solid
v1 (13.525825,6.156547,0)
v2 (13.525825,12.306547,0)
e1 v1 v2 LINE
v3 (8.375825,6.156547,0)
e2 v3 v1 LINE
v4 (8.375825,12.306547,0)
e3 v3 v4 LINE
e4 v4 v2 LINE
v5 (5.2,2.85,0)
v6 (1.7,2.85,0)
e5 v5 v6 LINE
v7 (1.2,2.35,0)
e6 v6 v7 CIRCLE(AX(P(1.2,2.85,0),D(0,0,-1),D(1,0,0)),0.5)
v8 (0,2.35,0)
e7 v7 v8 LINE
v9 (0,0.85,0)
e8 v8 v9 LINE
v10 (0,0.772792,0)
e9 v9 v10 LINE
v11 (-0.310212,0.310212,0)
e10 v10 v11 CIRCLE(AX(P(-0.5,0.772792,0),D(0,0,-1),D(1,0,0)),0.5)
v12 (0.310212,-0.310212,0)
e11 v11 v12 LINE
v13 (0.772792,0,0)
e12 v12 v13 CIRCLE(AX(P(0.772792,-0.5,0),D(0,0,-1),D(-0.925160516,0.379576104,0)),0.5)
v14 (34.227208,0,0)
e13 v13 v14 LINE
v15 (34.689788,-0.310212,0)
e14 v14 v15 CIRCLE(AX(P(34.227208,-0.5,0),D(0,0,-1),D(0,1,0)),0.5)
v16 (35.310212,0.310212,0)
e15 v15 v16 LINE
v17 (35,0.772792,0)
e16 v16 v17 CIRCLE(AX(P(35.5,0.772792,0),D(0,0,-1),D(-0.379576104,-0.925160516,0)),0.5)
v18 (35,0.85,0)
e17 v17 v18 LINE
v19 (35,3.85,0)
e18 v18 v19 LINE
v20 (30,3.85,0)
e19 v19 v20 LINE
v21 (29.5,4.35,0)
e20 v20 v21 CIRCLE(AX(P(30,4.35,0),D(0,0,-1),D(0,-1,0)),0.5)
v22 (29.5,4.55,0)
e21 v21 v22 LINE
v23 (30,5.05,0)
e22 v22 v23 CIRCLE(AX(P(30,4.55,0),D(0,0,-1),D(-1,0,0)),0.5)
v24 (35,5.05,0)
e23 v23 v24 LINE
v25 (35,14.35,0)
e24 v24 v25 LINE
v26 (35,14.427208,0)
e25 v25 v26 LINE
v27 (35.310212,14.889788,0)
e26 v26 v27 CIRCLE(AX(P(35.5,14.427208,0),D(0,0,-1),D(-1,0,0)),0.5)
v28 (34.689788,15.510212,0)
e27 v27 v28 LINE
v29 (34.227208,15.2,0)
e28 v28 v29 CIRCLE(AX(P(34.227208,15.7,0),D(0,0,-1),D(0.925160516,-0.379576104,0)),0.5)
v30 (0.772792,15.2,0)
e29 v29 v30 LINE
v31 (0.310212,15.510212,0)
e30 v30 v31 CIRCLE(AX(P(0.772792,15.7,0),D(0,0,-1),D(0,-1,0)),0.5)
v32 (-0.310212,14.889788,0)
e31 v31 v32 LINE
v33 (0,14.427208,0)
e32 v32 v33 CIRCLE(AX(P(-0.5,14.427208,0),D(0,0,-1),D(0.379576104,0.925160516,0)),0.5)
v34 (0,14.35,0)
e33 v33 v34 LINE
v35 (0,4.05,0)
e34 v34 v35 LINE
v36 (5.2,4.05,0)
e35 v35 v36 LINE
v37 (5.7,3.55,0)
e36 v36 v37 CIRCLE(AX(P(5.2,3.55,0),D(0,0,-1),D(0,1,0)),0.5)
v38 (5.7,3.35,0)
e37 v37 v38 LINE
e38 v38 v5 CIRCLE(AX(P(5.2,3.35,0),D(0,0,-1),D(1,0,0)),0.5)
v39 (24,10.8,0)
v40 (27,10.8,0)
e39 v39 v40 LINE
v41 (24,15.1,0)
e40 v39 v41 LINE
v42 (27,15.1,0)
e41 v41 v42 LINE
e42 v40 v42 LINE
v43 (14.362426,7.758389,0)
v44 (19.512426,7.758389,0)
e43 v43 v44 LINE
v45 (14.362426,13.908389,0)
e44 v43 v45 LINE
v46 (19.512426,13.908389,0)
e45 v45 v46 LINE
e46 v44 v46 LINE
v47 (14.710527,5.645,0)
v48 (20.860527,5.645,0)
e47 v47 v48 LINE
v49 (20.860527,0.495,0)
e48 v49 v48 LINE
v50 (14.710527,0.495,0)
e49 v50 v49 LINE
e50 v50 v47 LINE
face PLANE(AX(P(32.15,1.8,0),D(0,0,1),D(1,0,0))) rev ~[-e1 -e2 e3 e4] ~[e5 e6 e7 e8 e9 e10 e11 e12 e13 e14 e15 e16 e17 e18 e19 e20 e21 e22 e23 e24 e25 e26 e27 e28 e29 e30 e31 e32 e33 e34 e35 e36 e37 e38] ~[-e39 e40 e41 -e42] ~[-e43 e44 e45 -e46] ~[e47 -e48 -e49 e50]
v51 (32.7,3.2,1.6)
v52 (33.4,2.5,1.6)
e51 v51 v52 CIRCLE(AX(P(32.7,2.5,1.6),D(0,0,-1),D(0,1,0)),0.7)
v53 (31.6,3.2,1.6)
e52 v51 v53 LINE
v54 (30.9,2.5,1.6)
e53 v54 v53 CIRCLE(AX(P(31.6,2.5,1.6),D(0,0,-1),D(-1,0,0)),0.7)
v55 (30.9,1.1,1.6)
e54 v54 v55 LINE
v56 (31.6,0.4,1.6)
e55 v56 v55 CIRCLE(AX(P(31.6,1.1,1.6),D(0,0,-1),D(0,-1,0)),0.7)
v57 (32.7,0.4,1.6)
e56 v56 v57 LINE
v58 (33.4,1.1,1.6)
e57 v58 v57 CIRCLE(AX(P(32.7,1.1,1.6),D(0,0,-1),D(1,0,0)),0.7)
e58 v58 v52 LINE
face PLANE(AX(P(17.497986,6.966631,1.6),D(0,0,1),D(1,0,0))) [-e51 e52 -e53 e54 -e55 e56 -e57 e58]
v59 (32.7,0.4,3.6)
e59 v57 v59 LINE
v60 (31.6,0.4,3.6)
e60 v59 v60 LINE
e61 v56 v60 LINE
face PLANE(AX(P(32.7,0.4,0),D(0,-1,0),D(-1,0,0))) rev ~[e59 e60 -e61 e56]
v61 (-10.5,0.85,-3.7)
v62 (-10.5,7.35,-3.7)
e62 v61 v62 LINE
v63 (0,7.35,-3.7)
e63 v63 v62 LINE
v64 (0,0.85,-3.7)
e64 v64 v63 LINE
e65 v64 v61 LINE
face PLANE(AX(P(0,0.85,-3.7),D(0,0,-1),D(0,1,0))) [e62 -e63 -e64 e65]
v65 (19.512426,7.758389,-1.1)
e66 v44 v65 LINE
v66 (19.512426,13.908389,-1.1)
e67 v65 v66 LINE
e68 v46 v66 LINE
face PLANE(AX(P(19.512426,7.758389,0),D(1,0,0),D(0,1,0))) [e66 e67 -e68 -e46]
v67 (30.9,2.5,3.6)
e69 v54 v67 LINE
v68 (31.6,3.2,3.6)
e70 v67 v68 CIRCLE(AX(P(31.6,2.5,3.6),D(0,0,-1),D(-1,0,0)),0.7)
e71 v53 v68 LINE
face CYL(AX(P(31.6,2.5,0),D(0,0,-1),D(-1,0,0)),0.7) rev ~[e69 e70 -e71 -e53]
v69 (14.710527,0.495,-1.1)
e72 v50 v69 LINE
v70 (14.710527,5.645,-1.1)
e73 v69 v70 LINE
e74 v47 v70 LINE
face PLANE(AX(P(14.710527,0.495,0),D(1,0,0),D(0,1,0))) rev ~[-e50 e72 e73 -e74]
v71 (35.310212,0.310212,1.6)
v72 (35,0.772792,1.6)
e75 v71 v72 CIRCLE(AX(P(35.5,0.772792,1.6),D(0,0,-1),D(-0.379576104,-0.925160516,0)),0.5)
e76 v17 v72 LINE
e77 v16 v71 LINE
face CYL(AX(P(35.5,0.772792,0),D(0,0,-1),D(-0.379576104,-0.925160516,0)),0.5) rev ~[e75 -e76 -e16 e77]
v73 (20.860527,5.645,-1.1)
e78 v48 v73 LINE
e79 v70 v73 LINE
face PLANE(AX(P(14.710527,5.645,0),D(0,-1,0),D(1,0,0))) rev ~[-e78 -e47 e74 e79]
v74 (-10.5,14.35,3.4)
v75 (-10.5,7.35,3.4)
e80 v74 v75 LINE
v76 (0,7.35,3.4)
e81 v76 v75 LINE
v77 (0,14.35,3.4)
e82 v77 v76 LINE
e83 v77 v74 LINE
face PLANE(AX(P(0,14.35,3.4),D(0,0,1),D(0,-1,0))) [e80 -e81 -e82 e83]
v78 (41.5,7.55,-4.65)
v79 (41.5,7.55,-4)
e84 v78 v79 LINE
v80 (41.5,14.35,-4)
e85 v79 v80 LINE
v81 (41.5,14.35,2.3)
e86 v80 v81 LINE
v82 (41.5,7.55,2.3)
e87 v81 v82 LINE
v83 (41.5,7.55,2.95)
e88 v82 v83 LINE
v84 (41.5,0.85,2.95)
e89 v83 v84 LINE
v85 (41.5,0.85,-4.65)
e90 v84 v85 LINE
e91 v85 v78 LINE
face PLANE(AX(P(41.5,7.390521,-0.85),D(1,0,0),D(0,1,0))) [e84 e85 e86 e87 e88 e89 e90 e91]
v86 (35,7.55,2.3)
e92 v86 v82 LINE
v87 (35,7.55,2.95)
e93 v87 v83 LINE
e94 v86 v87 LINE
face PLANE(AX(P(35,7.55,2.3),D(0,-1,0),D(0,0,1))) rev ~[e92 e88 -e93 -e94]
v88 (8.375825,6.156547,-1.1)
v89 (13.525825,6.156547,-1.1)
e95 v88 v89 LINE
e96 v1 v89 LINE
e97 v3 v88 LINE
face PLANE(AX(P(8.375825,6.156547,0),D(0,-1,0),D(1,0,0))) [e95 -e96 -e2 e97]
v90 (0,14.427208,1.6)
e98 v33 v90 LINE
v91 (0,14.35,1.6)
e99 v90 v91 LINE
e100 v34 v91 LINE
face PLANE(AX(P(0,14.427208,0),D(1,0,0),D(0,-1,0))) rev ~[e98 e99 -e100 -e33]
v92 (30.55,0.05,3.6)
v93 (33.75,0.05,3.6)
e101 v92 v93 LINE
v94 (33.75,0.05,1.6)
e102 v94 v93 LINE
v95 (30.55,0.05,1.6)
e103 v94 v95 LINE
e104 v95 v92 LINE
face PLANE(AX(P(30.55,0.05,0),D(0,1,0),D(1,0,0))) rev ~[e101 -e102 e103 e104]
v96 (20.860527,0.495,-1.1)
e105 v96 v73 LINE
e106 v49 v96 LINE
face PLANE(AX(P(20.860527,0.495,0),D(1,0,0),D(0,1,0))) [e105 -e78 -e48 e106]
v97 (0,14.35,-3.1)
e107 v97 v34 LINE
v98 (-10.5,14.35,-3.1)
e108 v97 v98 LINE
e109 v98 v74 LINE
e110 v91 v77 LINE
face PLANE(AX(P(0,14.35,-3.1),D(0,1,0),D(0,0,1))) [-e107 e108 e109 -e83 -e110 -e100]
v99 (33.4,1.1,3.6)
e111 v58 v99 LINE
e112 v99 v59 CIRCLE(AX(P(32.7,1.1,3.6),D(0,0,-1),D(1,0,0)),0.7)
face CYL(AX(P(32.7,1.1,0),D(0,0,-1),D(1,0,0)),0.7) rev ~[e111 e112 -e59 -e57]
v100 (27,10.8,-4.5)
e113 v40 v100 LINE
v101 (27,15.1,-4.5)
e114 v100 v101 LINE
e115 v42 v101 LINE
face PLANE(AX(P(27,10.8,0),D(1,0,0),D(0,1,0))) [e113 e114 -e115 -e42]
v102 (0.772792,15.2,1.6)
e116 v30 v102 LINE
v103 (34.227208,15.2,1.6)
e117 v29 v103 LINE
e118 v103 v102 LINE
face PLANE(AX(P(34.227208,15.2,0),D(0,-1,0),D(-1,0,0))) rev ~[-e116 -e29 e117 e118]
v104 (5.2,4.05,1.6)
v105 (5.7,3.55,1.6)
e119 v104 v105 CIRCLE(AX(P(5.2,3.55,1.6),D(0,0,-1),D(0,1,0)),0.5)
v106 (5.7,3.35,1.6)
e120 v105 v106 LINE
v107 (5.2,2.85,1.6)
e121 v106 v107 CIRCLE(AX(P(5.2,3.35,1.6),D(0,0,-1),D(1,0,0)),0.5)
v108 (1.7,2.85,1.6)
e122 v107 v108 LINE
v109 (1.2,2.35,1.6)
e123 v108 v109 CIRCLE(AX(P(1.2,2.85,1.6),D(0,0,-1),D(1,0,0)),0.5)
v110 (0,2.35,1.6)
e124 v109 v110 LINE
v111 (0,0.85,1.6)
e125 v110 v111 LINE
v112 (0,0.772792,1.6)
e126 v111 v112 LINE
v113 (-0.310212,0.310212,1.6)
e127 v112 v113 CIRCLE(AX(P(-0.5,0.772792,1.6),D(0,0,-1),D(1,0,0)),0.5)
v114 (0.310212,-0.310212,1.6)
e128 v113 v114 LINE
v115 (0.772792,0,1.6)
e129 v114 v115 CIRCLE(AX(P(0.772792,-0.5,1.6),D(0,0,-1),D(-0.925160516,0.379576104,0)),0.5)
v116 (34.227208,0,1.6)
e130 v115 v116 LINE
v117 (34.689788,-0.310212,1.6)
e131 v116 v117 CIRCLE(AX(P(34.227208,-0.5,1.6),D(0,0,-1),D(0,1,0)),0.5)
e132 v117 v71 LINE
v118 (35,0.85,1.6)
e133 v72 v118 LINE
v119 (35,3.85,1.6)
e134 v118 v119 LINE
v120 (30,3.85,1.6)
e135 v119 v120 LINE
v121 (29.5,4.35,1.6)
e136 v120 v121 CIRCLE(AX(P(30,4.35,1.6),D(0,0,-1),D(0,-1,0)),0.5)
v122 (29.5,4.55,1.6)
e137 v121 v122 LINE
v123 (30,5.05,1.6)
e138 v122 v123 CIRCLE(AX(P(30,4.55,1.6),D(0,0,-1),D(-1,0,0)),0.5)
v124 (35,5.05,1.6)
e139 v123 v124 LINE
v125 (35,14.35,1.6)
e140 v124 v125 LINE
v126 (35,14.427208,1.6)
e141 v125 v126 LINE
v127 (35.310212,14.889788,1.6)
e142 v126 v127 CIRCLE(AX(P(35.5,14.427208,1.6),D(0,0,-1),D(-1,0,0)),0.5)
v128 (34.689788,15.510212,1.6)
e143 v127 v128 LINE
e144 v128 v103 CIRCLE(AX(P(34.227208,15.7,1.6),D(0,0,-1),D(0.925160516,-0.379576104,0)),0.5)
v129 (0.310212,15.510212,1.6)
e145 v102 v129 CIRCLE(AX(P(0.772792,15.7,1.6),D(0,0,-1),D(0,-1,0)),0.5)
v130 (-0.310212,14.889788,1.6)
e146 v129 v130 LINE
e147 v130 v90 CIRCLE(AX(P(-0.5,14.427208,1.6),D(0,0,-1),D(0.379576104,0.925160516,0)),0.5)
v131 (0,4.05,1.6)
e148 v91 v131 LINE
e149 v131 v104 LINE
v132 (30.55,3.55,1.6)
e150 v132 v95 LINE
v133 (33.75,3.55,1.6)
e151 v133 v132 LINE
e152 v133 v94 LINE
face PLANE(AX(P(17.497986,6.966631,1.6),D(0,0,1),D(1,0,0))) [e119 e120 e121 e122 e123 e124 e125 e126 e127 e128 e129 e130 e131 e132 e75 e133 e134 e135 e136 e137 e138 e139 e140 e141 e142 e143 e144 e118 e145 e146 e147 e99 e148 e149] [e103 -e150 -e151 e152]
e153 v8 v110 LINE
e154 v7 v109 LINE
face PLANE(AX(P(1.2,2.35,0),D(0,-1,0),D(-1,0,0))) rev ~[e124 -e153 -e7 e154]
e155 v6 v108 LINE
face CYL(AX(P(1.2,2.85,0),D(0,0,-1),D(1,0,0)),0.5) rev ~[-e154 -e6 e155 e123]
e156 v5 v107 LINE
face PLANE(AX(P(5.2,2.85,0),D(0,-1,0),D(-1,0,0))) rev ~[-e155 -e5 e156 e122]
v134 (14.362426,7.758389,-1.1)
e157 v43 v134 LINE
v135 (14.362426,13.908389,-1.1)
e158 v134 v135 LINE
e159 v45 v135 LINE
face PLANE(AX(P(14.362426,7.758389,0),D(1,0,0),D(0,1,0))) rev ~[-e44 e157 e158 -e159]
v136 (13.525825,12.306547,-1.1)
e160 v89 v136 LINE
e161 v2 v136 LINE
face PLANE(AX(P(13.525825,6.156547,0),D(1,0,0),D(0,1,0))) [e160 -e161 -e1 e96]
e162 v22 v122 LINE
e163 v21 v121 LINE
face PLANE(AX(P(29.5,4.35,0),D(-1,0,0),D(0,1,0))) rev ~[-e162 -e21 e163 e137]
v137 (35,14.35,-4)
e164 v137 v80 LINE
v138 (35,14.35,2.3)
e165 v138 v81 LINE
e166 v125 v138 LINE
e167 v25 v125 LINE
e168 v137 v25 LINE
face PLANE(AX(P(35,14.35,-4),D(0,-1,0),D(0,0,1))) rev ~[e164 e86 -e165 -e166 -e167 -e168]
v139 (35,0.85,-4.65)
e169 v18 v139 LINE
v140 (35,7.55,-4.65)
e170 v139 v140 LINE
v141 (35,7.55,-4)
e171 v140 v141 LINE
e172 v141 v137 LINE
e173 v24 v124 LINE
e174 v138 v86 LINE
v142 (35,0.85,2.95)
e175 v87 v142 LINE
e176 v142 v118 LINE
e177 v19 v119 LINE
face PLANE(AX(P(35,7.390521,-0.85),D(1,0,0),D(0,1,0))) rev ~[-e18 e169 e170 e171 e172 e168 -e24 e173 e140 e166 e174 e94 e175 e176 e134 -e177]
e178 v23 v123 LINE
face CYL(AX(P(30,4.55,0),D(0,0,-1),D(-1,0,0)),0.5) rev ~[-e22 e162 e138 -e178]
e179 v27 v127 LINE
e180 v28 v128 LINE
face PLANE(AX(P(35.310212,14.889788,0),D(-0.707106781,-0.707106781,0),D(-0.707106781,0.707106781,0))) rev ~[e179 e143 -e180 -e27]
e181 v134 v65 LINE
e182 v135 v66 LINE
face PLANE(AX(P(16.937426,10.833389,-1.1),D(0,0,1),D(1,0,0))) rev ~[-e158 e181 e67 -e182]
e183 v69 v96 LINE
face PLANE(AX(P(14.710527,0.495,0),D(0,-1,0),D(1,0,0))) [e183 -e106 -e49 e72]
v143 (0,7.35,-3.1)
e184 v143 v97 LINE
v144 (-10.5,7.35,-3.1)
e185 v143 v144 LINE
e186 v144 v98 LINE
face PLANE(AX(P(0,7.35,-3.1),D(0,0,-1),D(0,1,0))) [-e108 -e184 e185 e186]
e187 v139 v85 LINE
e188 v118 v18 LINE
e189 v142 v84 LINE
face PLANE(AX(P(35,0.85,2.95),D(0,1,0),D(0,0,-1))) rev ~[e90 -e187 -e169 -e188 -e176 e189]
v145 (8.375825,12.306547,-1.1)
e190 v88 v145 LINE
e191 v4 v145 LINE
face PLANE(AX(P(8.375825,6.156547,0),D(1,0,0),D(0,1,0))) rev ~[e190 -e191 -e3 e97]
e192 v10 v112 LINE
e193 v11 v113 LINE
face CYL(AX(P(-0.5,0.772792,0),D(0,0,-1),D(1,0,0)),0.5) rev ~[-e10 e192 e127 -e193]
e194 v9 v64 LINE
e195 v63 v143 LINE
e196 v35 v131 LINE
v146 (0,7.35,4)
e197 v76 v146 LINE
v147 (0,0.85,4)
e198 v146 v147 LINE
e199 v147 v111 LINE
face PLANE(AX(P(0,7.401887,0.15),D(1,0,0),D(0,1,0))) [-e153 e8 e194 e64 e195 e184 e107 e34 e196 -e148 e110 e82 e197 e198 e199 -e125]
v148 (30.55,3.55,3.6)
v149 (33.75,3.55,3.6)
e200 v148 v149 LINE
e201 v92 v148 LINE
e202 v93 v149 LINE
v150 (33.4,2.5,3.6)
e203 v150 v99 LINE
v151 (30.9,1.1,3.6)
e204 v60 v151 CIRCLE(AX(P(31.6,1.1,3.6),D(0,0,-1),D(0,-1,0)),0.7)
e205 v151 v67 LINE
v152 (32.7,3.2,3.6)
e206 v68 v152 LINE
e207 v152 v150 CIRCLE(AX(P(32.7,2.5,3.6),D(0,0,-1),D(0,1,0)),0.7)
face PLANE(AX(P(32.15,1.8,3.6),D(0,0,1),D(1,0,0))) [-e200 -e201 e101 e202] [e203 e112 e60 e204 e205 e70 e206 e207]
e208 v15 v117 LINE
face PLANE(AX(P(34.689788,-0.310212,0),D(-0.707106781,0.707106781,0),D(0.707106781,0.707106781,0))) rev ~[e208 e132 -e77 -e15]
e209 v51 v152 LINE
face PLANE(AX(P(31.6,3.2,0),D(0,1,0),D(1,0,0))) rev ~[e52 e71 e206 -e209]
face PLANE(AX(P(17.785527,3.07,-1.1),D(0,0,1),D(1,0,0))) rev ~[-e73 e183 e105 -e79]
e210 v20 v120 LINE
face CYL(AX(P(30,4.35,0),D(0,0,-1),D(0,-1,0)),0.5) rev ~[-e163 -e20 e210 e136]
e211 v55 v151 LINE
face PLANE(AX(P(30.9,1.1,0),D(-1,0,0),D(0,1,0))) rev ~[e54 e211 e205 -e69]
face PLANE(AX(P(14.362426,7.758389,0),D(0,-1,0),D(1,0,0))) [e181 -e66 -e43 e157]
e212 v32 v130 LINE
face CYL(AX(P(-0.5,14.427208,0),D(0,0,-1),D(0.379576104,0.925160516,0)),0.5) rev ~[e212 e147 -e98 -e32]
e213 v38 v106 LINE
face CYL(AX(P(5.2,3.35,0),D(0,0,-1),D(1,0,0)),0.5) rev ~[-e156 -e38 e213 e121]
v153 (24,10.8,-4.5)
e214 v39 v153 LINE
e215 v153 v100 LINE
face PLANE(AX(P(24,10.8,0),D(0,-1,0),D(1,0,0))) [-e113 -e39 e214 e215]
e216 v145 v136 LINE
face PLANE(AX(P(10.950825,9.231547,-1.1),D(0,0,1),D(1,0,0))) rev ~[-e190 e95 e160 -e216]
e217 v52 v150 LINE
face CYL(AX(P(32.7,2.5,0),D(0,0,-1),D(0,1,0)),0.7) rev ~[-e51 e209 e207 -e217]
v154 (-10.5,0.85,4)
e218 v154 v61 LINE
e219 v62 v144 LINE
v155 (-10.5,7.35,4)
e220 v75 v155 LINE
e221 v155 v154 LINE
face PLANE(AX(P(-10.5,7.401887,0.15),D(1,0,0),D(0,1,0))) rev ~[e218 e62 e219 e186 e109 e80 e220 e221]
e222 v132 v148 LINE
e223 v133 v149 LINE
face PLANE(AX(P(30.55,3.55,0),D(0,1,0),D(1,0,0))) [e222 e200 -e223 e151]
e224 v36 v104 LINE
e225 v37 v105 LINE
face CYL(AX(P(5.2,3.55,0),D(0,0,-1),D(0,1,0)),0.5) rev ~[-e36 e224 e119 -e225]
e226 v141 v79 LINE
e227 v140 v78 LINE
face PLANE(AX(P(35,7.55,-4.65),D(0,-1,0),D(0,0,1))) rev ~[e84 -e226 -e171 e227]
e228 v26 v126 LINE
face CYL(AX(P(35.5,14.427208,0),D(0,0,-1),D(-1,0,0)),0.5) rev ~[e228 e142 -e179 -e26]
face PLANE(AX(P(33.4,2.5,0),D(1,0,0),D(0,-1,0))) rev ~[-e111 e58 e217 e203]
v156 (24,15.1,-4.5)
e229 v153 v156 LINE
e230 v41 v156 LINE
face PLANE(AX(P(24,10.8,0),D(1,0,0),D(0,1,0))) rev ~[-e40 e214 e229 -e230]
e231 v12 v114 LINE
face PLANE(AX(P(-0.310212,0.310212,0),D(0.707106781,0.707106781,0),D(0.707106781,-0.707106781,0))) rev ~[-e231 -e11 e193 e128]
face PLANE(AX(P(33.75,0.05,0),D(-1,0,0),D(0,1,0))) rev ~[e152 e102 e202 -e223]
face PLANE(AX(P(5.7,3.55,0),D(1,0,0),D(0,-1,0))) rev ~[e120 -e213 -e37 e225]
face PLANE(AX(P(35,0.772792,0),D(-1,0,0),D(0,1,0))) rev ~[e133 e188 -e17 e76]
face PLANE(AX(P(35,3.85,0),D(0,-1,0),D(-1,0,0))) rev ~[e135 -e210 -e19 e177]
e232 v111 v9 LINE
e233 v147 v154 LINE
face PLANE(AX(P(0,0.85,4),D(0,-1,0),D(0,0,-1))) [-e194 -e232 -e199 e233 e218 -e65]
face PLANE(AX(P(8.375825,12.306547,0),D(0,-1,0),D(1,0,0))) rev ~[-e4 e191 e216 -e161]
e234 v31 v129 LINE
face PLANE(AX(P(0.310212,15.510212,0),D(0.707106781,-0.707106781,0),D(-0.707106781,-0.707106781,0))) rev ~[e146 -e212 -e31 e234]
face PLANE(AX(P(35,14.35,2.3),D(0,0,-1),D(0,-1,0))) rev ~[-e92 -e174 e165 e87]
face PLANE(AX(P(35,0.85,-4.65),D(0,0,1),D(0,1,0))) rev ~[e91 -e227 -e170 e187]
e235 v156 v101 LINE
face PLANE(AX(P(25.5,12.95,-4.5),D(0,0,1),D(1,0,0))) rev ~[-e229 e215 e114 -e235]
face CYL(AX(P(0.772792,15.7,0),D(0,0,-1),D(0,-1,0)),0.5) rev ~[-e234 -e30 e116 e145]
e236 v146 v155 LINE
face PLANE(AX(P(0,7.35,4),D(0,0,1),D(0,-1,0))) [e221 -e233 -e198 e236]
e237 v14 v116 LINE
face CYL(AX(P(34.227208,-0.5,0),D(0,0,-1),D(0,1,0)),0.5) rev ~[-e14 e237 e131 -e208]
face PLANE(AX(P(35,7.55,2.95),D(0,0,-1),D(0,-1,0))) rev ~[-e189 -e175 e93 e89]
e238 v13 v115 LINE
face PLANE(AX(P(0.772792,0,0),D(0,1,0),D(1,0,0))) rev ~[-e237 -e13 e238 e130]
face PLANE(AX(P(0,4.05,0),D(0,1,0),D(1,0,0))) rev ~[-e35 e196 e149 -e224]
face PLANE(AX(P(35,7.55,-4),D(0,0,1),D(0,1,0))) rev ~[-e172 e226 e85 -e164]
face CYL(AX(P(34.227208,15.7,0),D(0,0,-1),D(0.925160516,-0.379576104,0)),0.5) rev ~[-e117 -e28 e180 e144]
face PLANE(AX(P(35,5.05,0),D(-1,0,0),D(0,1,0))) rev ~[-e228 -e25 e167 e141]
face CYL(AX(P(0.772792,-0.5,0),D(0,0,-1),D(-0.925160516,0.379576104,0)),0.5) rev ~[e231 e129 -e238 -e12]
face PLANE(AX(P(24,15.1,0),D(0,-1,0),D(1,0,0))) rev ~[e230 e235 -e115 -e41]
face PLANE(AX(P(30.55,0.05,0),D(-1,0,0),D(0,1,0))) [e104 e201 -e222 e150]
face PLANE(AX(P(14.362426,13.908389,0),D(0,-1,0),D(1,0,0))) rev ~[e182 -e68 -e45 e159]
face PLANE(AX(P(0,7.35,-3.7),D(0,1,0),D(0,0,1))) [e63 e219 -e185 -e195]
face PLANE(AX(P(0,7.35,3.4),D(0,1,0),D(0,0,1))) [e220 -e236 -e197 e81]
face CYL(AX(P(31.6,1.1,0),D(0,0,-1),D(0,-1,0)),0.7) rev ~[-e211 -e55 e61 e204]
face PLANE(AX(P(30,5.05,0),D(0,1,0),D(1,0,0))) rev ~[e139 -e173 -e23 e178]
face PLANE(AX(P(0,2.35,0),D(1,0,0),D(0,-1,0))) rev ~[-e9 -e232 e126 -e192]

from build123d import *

# Parameters (mm, degrees)
F1_DEPTH  = 1.6
F3_DEPTH  = 10.5
F5_START  = 35
F5_DEPTH  = 6.5
F6_W      = 3.2
F6_H      = 3.5
F7_DEPTH  = 3.6
F8_W      = 3
F8_H      = 4.3
F9_DEPTH  = 4.5
F10_W     = 5.15
F10_H     = 6.15
F10_W_2   = 6.15
F10_H_2   = 5.15
F11_DEPTH = 1.1


with BuildPart() as f1:
    # F0 (on Top) → F1 (new body)
    with BuildSketch(Plane.XY):
        with BuildLine():
            Line((1.2, 15.2), (0.7727922061, 15.2))
            ThreePointArc((0.7727922061, 15.2), (0.4943088368, 15.2847326006), (0.3102119479, 15.5102119479))
            Line((0.3102119479, 15.5102119479), (-0.3102119479, 14.8897880521))
            ThreePointArc((-0.3102119479, 14.8897880521), (-0.0847326006, 14.7056911632), (0, 14.4272077939))
            Line((0, 14.4272077939), (0, 4.05))
            Line((0, 4.05), (5.2, 4.05))
            ThreePointArc((5.2, 4.05), (5.5535533906, 3.9035533906), (5.7, 3.55))
            Line((5.7, 3.55), (5.7, 3.35))
            ThreePointArc((5.7, 3.35), (5.5535533906, 2.9964466094), (5.2, 2.85))
            Line((5.2, 2.85), (1.7, 2.85))
            ThreePointArc((1.7, 2.85), (1.5535533906, 2.4964466094), (1.2, 2.35))
            Line((1.2, 2.35), (0, 2.35))
            Line((0, 2.35), (0, 0.7727922061))
            ThreePointArc((0, 0.7727922061), (-0.0847326006, 0.4943088368), (-0.3102119479, 0.3102119479))
            Line((-0.3102119479, 0.3102119479), (0.3102119479, -0.3102119479))
            ThreePointArc((0.3102119479, -0.3102119479), (0.4943088368, -0.0847326006), (0.7727922061, 0))
            Line((0.7727922061, 0), (1.2, 0))
            Line((1.2, 0), (33.8, 0))
            Line((33.8, 0), (34.2272077939, 0))
            ThreePointArc((34.2272077939, 0), (34.5056911632, -0.0847326006), (34.6897880521, -0.3102119479))
            Line((34.6897880521, -0.3102119479), (35.3102119479, 0.3102119479))
            ThreePointArc((35.3102119479, 0.3102119479), (35.0847326006, 0.4943088368), (35, 0.7727922061))
            Line((35, 0.7727922061), (35, 3.85))
            Line((35, 3.85), (30, 3.85))
            ThreePointArc((30, 3.85), (29.6464466094, 3.9964466094), (29.5, 4.35))
            Line((29.5, 4.35), (29.5, 4.55))
            ThreePointArc((29.5, 4.55), (29.6464466094, 4.9035533906), (30, 5.05))
            Line((30, 5.05), (35, 5.05))
            Line((35, 5.05), (35, 14.4272077939))
            ThreePointArc((35, 14.4272077939), (35.0847326006, 14.7056911632), (35.3102119479, 14.8897880521))
            Line((35.3102119479, 14.8897880521), (34.6897880521, 15.5102119479))
            ThreePointArc((34.6897880521, 15.5102119479), (34.5056911632, 15.2847326006), (34.2272077939, 15.2))
            Line((34.2272077939, 15.2), (33.8, 15.2))
            Line((33.8, 15.2), (1.2, 15.2))
        make_face()
    extrude(amount=F1_DEPTH)

    # F2 (on Right) → F3 (join)
    with BuildSketch(Plane.YZ):
        Polygon((7.35, 4), (0.85, 4), (0.85, -3.7), (7.35, -3.7), (7.35, -3.1), (14.35, -3.1), (14.35, 3.4), (7.35, 3.4), align=None)
    extrude(amount=-F3_DEPTH)

    # F4 (on Right) → F5 (join)
    with BuildSketch(Plane.YZ.offset(F5_START)):
        Polygon((7.55, 2.95), (0.85, 2.95), (0.85, -4.65), (7.55, -4.65), (7.55, -4), (14.35, -4), (14.35, 2.3), (7.55, 2.3), align=None)
    extrude(amount=F5_DEPTH)

    # F6 (on Top) → F7 (join)
    with BuildSketch(Plane.XY):
        with Locations((32.15, 1.8)):
            Rectangle(F6_W, F6_H)
        with BuildLine():
            ThreePointArc((30.9, 2.5), (31.1050252532, 2.9949747468), (31.6, 3.2))
            Line((31.6, 3.2), (32.7, 3.2))
            ThreePointArc((32.7, 3.2), (33.1949747468, 2.9949747468), (33.4, 2.5))
            Line((33.4, 2.5), (33.4, 1.1))
            ThreePointArc((33.4, 1.1), (33.1949747468, 0.6050252532), (32.7, 0.4))
            Line((32.7, 0.4), (31.6, 0.4))
            ThreePointArc((31.6, 0.4), (31.1050252532, 0.6050252532), (30.9, 1.1))
            Line((30.9, 1.1), (30.9, 2.5))
        make_face(mode=Mode.SUBTRACT)
    extrude(amount=F7_DEPTH)

    # F8 (on Top) → F9 (join)
    with BuildSketch(Plane.XY):
        with Locations((25.5, 12.95)):
            Rectangle(F8_W, F8_H)
    extrude(amount=-F9_DEPTH)

    # F10 (on Top) → F11 (join)
    with BuildSketch(Plane.XY):
        with Locations((10.9508251641, 9.2315472887)):
            Rectangle(F10_W, F10_H)
        with Locations((16.9374256049, 10.8333893863)):
            Rectangle(F10_W, F10_H)
        with Locations((17.7855274571, 3.0699999196)):
            Rectangle(F10_W_2, F10_H_2)
    extrude(amount=-F11_DEPTH)


solid = f1.part
